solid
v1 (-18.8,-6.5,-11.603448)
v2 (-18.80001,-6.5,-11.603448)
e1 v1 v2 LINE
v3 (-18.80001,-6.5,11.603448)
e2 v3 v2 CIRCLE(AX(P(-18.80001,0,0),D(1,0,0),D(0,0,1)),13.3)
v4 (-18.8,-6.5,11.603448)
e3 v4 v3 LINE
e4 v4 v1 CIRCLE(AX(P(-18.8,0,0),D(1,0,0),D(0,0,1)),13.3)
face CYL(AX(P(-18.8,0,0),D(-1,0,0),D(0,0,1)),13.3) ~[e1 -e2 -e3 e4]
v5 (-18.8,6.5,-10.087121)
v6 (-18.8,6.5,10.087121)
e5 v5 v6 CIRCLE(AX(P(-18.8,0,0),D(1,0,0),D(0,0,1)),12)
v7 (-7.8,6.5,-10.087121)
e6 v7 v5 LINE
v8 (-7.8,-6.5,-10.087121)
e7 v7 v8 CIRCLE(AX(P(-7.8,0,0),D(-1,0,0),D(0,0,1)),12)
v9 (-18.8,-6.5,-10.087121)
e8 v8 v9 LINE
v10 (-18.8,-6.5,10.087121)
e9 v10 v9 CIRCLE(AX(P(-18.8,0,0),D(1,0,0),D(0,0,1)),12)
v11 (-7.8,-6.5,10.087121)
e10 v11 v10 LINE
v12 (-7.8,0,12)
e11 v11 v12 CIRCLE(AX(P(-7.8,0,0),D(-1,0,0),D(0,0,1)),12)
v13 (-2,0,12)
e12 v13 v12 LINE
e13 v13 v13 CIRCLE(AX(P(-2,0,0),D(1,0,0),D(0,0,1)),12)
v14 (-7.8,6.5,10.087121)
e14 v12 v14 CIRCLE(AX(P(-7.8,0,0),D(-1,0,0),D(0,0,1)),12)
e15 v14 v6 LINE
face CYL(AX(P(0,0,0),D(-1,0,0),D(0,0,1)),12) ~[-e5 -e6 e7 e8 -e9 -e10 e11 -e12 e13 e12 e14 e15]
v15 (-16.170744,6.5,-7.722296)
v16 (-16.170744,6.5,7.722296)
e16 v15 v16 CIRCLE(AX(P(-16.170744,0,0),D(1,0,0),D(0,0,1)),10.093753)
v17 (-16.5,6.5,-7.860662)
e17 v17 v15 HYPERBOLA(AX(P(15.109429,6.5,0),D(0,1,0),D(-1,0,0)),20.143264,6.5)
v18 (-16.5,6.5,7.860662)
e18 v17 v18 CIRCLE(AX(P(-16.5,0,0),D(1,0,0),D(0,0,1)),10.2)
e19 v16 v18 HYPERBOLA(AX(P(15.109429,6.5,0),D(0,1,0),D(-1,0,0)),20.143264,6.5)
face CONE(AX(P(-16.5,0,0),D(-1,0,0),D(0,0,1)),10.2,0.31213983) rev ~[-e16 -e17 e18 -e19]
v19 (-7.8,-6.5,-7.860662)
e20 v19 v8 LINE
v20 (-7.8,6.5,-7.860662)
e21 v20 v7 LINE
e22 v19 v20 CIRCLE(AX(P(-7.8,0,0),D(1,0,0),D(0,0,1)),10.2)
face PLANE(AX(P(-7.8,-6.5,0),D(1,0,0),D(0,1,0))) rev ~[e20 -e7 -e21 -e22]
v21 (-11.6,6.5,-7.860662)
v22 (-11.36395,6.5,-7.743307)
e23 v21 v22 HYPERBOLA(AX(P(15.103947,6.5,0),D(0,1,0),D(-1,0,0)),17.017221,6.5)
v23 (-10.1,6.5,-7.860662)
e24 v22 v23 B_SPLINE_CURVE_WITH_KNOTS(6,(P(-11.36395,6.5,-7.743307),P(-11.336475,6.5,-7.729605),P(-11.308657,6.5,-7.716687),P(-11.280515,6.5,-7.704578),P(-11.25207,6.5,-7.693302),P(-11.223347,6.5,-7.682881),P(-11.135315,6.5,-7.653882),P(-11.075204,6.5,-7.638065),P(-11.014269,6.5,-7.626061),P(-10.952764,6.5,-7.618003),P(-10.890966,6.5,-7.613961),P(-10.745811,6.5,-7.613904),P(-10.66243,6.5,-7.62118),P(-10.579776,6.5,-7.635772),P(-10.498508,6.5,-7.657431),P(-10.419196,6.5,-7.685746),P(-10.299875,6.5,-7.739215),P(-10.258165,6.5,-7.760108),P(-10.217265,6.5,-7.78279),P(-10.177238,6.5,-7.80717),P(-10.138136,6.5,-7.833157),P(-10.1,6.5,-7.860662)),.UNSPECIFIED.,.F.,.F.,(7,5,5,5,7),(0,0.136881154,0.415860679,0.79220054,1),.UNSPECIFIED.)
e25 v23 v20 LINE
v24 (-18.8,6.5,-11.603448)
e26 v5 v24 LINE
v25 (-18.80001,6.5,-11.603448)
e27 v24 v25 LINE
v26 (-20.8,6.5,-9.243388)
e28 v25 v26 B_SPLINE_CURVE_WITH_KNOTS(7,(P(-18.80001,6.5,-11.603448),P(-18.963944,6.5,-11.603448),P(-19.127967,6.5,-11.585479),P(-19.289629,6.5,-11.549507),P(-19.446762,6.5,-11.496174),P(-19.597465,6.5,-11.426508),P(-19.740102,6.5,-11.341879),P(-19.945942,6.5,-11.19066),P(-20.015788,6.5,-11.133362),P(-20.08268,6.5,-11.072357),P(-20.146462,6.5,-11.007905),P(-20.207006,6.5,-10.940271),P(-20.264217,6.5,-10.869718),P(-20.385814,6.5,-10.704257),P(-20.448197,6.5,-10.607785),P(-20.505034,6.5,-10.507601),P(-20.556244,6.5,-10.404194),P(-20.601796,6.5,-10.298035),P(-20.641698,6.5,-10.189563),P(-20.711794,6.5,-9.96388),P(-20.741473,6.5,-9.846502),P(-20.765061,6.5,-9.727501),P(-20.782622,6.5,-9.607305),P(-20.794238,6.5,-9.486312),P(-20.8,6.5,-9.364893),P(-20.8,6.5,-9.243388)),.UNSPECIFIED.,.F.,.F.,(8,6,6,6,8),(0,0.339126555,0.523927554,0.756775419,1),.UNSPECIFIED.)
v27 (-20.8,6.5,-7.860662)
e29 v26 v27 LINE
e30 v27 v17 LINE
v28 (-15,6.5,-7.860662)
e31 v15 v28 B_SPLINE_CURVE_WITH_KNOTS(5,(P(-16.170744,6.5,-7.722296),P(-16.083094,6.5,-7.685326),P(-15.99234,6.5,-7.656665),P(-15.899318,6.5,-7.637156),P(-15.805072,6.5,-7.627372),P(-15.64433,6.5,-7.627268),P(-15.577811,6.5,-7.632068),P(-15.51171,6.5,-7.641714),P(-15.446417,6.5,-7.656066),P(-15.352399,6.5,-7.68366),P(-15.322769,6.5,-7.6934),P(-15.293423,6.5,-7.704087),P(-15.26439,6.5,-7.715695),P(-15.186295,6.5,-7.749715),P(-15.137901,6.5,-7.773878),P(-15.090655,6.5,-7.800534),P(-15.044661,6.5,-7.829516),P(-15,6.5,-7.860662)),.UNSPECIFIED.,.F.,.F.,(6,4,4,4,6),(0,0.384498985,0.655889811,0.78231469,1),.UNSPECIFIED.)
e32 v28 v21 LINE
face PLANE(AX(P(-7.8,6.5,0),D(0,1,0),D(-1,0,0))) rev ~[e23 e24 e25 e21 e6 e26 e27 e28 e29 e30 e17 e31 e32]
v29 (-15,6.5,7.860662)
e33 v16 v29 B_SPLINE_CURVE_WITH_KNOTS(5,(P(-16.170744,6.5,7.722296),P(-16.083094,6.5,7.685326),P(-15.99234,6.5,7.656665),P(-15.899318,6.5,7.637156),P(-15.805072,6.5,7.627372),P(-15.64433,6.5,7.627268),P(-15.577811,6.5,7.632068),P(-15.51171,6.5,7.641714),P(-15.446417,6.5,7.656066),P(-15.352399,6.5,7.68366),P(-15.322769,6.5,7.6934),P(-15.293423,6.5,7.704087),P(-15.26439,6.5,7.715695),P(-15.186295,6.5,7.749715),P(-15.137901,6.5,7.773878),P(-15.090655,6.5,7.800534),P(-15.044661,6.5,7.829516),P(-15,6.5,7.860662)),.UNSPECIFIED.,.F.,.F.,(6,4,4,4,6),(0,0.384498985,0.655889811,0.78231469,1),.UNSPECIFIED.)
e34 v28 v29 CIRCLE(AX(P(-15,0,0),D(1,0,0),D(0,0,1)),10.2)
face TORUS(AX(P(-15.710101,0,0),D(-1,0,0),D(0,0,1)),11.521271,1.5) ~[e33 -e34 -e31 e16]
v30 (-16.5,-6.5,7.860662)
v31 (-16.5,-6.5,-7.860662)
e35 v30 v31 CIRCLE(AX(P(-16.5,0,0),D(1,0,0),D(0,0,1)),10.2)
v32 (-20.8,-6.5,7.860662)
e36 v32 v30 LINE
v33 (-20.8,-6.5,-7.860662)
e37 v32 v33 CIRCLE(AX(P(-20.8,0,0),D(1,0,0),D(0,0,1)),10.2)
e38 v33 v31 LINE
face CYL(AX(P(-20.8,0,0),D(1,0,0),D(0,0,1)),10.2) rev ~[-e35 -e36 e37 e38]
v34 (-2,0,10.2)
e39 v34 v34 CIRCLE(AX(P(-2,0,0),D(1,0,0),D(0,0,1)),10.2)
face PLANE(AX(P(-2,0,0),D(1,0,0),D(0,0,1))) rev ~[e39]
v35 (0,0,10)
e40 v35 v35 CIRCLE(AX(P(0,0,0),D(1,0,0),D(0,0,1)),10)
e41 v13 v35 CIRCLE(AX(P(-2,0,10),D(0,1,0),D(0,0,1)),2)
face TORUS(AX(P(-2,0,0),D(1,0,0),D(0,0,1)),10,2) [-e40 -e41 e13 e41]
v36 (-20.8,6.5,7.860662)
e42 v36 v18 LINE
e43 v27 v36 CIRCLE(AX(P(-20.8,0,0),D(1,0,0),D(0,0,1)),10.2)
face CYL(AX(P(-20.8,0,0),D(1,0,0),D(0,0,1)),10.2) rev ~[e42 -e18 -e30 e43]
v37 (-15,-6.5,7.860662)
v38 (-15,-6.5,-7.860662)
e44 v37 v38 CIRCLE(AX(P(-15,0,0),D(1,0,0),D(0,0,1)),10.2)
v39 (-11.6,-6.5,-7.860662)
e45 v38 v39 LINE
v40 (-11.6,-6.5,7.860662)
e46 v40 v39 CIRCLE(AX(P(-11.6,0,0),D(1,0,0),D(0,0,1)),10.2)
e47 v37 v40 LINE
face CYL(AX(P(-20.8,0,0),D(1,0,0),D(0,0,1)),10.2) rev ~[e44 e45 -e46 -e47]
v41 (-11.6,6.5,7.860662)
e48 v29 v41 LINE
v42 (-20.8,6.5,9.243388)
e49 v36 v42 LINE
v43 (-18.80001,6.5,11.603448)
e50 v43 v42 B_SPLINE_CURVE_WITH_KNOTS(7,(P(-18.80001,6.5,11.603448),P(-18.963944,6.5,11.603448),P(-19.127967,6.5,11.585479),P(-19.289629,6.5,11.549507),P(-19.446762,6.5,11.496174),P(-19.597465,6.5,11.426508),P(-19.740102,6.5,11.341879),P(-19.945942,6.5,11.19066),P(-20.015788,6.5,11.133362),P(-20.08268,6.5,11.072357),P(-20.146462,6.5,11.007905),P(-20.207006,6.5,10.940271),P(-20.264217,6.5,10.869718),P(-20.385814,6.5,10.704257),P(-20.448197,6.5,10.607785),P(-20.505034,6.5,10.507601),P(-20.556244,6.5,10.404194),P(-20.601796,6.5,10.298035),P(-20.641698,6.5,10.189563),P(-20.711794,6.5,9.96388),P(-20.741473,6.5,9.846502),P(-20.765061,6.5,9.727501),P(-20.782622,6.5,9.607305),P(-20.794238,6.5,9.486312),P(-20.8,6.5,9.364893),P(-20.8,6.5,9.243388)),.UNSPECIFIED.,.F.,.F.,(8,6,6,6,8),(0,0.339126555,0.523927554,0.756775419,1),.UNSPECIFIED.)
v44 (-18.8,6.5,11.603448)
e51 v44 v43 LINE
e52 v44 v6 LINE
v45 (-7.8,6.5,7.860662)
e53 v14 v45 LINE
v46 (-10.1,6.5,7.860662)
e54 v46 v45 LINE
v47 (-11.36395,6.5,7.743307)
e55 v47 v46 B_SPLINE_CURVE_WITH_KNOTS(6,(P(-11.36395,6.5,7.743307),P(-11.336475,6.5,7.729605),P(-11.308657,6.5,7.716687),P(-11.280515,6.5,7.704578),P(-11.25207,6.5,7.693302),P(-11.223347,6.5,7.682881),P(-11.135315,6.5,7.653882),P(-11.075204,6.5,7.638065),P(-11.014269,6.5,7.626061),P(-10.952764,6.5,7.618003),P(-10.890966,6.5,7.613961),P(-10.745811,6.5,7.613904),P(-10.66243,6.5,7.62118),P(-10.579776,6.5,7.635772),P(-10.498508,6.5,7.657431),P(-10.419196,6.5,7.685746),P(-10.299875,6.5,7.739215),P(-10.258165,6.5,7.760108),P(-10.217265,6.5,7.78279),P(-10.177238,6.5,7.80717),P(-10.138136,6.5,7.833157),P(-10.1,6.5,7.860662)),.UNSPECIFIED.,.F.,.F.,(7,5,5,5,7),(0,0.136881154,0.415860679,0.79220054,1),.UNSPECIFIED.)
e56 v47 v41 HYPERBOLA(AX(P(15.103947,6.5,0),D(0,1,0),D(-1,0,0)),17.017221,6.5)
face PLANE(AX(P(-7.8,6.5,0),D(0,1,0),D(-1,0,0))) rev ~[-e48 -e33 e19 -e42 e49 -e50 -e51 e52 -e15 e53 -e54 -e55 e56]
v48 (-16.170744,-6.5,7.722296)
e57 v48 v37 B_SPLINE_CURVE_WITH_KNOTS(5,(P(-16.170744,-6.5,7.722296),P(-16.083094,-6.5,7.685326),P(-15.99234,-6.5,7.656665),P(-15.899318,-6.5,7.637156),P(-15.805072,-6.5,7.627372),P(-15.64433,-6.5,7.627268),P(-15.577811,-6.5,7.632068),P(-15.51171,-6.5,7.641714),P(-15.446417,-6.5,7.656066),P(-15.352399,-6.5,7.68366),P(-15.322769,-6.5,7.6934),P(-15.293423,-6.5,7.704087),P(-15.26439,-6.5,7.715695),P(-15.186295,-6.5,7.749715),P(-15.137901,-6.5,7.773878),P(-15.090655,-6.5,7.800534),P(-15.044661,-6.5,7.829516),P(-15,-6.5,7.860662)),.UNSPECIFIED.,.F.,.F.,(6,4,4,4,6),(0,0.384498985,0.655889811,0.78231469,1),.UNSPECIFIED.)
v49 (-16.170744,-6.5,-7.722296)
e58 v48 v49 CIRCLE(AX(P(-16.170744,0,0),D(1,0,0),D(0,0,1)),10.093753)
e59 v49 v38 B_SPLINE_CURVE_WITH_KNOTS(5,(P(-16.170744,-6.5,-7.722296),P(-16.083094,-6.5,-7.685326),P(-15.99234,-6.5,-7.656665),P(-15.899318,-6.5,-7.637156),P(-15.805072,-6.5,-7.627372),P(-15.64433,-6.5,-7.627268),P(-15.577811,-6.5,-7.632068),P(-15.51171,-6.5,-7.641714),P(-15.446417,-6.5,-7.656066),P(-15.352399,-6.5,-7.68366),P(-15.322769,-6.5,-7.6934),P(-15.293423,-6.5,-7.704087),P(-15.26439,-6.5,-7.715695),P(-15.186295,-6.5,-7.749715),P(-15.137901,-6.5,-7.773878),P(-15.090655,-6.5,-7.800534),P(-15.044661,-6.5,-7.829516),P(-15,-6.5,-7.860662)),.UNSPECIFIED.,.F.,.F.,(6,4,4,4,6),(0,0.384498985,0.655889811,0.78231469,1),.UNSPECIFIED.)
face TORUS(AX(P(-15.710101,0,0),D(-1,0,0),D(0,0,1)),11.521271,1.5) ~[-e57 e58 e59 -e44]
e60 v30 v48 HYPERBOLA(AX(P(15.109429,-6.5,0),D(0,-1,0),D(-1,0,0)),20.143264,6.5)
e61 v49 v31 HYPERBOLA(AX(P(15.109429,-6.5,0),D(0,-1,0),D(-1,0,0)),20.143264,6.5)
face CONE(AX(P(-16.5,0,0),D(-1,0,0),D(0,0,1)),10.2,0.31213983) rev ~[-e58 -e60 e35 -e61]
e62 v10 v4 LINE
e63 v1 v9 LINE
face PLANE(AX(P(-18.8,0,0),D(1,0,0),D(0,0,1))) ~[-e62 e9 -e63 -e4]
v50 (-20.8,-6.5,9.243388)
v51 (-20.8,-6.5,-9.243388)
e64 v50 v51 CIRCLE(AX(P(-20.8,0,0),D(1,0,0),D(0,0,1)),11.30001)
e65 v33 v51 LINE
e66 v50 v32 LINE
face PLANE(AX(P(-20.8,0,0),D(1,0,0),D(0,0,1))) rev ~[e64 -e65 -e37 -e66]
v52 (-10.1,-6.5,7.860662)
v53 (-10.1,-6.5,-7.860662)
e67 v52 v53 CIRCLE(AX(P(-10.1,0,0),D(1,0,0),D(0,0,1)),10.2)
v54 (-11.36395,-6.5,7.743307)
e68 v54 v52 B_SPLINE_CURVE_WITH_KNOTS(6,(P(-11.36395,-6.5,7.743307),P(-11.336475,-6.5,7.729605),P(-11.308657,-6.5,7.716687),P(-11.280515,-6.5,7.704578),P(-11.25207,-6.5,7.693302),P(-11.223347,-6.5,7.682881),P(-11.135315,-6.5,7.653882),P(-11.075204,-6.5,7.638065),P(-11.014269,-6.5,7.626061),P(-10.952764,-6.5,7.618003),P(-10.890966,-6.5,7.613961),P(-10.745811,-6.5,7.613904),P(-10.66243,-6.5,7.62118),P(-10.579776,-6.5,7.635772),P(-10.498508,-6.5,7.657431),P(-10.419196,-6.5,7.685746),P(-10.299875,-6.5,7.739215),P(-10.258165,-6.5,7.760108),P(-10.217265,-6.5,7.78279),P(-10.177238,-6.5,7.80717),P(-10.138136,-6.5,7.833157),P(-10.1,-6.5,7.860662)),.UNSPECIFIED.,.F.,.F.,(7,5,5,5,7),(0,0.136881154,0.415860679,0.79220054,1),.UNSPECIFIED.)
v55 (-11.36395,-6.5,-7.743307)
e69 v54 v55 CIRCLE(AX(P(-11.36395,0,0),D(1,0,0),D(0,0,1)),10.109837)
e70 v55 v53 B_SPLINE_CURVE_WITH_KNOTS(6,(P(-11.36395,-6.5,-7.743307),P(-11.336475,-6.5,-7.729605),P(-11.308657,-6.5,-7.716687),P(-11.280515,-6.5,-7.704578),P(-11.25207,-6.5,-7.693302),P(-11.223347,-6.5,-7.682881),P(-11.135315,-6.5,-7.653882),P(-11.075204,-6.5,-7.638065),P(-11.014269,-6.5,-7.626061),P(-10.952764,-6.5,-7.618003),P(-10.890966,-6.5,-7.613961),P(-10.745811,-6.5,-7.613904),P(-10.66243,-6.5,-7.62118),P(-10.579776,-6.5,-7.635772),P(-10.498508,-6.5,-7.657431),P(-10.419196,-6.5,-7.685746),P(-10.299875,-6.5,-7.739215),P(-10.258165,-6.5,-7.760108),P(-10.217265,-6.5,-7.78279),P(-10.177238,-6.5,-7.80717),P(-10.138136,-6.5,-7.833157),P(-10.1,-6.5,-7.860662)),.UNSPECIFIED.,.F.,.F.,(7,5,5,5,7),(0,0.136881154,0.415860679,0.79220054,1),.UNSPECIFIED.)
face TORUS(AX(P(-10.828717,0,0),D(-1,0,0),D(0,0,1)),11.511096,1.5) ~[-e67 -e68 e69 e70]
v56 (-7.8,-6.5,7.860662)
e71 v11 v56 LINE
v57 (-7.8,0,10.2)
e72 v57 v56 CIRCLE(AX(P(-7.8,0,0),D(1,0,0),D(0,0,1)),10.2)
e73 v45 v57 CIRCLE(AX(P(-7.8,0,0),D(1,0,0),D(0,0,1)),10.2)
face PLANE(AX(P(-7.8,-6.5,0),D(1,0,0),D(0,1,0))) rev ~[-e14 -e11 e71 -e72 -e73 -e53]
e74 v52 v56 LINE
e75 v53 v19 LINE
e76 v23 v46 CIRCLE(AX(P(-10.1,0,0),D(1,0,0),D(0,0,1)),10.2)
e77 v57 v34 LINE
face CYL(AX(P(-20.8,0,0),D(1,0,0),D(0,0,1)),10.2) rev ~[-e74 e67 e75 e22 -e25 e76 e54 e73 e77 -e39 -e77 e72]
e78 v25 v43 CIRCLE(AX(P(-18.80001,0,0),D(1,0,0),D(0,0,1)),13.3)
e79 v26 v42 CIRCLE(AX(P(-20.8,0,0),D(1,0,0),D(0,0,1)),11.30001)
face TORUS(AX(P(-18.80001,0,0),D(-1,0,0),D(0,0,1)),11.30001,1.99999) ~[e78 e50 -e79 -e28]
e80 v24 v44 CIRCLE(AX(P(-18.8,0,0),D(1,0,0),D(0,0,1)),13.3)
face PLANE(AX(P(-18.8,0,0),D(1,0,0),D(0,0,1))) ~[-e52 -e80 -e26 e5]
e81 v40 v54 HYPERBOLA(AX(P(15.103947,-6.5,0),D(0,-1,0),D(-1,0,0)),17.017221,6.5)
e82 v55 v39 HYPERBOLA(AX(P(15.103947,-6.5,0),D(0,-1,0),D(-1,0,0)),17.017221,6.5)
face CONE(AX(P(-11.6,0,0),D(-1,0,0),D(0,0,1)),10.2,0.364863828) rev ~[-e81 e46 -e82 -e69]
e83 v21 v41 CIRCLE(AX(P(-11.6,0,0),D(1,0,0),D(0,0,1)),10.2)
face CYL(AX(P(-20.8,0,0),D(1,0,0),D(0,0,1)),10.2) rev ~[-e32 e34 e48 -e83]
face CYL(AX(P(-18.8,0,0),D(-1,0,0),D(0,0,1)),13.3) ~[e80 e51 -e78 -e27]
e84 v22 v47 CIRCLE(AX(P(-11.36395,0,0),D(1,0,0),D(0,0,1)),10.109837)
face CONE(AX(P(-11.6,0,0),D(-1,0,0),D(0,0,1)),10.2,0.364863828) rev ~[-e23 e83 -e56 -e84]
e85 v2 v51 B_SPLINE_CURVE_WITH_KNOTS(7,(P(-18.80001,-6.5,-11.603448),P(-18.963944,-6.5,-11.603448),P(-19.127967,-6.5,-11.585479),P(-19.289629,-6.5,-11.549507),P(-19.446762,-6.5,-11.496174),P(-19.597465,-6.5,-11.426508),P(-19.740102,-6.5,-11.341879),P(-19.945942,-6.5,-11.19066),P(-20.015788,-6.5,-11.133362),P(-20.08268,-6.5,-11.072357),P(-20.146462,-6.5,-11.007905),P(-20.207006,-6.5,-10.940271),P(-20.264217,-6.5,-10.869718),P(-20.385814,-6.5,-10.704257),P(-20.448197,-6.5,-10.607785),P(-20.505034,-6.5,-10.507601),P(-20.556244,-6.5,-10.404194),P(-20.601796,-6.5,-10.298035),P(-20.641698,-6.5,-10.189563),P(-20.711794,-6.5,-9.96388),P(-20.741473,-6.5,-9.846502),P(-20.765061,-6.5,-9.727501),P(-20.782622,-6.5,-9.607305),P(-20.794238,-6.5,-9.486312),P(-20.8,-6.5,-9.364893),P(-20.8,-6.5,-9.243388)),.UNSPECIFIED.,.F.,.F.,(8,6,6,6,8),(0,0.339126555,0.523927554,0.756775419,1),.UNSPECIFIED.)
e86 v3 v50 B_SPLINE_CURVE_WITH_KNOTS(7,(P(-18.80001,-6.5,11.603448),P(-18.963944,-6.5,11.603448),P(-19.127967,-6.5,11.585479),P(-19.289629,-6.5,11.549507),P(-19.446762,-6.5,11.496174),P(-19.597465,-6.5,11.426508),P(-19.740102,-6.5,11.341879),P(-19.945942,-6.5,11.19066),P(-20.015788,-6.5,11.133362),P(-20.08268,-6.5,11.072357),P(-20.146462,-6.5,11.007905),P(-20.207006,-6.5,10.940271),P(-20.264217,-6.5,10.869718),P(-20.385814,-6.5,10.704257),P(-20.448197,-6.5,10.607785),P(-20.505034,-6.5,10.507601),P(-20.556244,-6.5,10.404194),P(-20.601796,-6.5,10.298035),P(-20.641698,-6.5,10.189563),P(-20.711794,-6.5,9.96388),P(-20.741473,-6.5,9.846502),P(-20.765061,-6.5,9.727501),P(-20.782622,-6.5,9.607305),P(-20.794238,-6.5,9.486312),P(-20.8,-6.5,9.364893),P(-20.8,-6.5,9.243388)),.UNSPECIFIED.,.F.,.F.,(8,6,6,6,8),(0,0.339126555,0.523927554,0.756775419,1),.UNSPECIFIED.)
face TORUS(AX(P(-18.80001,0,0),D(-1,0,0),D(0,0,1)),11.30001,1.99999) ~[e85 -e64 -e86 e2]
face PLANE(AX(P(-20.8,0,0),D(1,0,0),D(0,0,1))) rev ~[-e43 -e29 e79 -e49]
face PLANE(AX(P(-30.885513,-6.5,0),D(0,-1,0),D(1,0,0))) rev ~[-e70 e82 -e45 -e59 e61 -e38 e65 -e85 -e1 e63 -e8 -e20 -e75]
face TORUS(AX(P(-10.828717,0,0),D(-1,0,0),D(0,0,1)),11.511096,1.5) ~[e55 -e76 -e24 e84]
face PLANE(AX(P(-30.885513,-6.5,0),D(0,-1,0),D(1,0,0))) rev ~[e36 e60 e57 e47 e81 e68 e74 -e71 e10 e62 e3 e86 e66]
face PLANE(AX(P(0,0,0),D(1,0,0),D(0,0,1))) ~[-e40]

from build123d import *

# Parameters (mm, degrees)
F1_R     = 1.99999
F2_DEPTH = 25
F6_R     = 2


# Not quite as in the source:
# - a fillet or chamfer that OpenCascade refuses, or shapes differently, is made with other operations: its cross-section is extruded or revolved along the edge and cut away or added
# - a fillet or chamfer is up to 0.001 mm smaller than in the source, because OpenCascade refuses the exact size


with BuildPart() as f0:
    # F3 (on Front) → F0 (revolve)
    with BuildSketch(Plane.XZ):
        Polygon((-2, 0), (0, 0), (0, 12), (-18.8, 12), (-18.8, 13.3), (-20.8, 13.3), (-20.8, 10.2), (-16.5, 10.2), (-15, 10.2), (-11.6, 10.2), (-10.1, 10.2), (-2, 10.2), align=None)
        Polygon((-14.9505181851, 9.7), (-15, 10.2), (-16.5, 10.2), align=None)
        Polygon((-10.2909830056, 9.7), (-10.1, 10.2), (-11.6, 10.2), align=None)
    revolve(axis=Axis((-1, 0, 0), (1, 0, 0)))

    # F1 (radius 2 in the source; OpenCascade refuses exactly that, so slightly less here)
    f1_edges = [f0.edges().sort_by_distance(p)[0] for p in [
        (-20.8, 0, -13.3),
    ]]
    fillet(f1_edges, radius=F1_R)

    # F4: fillet of radius 1.5 on 2 edges, made by hand

    # F4_s1 → F4_t2 (revolve, cut)
    with BuildSketch(Plane.XZ):
        with BuildLine():
            ThreePointArc((-16.1707444356, 10.0937530079), (-15.5745304293, 10.0274099354), (-15, 10.2))
            Line((-15, 10.2), (-14.9505181851, 9.7))
            Line((-14.9505181851, 9.7), (-16.1707444356, 10.0937530079))
        make_face()
    revolve(axis=Axis((-14.9505181851, 0, 0), (1, 0, 0)), mode=Mode.SUBTRACT)

    # F4_s3 → F4_t4 (revolve, cut)
    with BuildSketch(Plane.XZ):
        with BuildLine():
            ThreePointArc((-11.3639501712, 10.1098369884), (-10.721986782, 10.0148974609), (-10.1, 10.2))
            Line((-10.1, 10.2), (-10.2909830056, 9.7))
            Line((-10.2909830056, 9.7), (-11.3639501712, 10.1098369884))
        make_face()
    revolve(axis=Axis((-10.2909830056, 0, 0), (1, 0, 0)), mode=Mode.SUBTRACT)

    # F5 (on Top) → F2 (cut, symmetric)
    with BuildSketch(Plane.XY):
        Polygon((-7.8, 6.5), (-30.9797403524, 6.5), (-30.8855128417, -6.5), (-7.8, -6.5), align=None)
    extrude(amount=F2_DEPTH, both=True, mode=Mode.SUBTRACT)

    # F6
    f6_edges = [f0.edges().sort_by_distance(p)[0] for p in [
        (0, 0, -12),
    ]]
    fillet(f6_edges, radius=F6_R)


solid = f0.part
